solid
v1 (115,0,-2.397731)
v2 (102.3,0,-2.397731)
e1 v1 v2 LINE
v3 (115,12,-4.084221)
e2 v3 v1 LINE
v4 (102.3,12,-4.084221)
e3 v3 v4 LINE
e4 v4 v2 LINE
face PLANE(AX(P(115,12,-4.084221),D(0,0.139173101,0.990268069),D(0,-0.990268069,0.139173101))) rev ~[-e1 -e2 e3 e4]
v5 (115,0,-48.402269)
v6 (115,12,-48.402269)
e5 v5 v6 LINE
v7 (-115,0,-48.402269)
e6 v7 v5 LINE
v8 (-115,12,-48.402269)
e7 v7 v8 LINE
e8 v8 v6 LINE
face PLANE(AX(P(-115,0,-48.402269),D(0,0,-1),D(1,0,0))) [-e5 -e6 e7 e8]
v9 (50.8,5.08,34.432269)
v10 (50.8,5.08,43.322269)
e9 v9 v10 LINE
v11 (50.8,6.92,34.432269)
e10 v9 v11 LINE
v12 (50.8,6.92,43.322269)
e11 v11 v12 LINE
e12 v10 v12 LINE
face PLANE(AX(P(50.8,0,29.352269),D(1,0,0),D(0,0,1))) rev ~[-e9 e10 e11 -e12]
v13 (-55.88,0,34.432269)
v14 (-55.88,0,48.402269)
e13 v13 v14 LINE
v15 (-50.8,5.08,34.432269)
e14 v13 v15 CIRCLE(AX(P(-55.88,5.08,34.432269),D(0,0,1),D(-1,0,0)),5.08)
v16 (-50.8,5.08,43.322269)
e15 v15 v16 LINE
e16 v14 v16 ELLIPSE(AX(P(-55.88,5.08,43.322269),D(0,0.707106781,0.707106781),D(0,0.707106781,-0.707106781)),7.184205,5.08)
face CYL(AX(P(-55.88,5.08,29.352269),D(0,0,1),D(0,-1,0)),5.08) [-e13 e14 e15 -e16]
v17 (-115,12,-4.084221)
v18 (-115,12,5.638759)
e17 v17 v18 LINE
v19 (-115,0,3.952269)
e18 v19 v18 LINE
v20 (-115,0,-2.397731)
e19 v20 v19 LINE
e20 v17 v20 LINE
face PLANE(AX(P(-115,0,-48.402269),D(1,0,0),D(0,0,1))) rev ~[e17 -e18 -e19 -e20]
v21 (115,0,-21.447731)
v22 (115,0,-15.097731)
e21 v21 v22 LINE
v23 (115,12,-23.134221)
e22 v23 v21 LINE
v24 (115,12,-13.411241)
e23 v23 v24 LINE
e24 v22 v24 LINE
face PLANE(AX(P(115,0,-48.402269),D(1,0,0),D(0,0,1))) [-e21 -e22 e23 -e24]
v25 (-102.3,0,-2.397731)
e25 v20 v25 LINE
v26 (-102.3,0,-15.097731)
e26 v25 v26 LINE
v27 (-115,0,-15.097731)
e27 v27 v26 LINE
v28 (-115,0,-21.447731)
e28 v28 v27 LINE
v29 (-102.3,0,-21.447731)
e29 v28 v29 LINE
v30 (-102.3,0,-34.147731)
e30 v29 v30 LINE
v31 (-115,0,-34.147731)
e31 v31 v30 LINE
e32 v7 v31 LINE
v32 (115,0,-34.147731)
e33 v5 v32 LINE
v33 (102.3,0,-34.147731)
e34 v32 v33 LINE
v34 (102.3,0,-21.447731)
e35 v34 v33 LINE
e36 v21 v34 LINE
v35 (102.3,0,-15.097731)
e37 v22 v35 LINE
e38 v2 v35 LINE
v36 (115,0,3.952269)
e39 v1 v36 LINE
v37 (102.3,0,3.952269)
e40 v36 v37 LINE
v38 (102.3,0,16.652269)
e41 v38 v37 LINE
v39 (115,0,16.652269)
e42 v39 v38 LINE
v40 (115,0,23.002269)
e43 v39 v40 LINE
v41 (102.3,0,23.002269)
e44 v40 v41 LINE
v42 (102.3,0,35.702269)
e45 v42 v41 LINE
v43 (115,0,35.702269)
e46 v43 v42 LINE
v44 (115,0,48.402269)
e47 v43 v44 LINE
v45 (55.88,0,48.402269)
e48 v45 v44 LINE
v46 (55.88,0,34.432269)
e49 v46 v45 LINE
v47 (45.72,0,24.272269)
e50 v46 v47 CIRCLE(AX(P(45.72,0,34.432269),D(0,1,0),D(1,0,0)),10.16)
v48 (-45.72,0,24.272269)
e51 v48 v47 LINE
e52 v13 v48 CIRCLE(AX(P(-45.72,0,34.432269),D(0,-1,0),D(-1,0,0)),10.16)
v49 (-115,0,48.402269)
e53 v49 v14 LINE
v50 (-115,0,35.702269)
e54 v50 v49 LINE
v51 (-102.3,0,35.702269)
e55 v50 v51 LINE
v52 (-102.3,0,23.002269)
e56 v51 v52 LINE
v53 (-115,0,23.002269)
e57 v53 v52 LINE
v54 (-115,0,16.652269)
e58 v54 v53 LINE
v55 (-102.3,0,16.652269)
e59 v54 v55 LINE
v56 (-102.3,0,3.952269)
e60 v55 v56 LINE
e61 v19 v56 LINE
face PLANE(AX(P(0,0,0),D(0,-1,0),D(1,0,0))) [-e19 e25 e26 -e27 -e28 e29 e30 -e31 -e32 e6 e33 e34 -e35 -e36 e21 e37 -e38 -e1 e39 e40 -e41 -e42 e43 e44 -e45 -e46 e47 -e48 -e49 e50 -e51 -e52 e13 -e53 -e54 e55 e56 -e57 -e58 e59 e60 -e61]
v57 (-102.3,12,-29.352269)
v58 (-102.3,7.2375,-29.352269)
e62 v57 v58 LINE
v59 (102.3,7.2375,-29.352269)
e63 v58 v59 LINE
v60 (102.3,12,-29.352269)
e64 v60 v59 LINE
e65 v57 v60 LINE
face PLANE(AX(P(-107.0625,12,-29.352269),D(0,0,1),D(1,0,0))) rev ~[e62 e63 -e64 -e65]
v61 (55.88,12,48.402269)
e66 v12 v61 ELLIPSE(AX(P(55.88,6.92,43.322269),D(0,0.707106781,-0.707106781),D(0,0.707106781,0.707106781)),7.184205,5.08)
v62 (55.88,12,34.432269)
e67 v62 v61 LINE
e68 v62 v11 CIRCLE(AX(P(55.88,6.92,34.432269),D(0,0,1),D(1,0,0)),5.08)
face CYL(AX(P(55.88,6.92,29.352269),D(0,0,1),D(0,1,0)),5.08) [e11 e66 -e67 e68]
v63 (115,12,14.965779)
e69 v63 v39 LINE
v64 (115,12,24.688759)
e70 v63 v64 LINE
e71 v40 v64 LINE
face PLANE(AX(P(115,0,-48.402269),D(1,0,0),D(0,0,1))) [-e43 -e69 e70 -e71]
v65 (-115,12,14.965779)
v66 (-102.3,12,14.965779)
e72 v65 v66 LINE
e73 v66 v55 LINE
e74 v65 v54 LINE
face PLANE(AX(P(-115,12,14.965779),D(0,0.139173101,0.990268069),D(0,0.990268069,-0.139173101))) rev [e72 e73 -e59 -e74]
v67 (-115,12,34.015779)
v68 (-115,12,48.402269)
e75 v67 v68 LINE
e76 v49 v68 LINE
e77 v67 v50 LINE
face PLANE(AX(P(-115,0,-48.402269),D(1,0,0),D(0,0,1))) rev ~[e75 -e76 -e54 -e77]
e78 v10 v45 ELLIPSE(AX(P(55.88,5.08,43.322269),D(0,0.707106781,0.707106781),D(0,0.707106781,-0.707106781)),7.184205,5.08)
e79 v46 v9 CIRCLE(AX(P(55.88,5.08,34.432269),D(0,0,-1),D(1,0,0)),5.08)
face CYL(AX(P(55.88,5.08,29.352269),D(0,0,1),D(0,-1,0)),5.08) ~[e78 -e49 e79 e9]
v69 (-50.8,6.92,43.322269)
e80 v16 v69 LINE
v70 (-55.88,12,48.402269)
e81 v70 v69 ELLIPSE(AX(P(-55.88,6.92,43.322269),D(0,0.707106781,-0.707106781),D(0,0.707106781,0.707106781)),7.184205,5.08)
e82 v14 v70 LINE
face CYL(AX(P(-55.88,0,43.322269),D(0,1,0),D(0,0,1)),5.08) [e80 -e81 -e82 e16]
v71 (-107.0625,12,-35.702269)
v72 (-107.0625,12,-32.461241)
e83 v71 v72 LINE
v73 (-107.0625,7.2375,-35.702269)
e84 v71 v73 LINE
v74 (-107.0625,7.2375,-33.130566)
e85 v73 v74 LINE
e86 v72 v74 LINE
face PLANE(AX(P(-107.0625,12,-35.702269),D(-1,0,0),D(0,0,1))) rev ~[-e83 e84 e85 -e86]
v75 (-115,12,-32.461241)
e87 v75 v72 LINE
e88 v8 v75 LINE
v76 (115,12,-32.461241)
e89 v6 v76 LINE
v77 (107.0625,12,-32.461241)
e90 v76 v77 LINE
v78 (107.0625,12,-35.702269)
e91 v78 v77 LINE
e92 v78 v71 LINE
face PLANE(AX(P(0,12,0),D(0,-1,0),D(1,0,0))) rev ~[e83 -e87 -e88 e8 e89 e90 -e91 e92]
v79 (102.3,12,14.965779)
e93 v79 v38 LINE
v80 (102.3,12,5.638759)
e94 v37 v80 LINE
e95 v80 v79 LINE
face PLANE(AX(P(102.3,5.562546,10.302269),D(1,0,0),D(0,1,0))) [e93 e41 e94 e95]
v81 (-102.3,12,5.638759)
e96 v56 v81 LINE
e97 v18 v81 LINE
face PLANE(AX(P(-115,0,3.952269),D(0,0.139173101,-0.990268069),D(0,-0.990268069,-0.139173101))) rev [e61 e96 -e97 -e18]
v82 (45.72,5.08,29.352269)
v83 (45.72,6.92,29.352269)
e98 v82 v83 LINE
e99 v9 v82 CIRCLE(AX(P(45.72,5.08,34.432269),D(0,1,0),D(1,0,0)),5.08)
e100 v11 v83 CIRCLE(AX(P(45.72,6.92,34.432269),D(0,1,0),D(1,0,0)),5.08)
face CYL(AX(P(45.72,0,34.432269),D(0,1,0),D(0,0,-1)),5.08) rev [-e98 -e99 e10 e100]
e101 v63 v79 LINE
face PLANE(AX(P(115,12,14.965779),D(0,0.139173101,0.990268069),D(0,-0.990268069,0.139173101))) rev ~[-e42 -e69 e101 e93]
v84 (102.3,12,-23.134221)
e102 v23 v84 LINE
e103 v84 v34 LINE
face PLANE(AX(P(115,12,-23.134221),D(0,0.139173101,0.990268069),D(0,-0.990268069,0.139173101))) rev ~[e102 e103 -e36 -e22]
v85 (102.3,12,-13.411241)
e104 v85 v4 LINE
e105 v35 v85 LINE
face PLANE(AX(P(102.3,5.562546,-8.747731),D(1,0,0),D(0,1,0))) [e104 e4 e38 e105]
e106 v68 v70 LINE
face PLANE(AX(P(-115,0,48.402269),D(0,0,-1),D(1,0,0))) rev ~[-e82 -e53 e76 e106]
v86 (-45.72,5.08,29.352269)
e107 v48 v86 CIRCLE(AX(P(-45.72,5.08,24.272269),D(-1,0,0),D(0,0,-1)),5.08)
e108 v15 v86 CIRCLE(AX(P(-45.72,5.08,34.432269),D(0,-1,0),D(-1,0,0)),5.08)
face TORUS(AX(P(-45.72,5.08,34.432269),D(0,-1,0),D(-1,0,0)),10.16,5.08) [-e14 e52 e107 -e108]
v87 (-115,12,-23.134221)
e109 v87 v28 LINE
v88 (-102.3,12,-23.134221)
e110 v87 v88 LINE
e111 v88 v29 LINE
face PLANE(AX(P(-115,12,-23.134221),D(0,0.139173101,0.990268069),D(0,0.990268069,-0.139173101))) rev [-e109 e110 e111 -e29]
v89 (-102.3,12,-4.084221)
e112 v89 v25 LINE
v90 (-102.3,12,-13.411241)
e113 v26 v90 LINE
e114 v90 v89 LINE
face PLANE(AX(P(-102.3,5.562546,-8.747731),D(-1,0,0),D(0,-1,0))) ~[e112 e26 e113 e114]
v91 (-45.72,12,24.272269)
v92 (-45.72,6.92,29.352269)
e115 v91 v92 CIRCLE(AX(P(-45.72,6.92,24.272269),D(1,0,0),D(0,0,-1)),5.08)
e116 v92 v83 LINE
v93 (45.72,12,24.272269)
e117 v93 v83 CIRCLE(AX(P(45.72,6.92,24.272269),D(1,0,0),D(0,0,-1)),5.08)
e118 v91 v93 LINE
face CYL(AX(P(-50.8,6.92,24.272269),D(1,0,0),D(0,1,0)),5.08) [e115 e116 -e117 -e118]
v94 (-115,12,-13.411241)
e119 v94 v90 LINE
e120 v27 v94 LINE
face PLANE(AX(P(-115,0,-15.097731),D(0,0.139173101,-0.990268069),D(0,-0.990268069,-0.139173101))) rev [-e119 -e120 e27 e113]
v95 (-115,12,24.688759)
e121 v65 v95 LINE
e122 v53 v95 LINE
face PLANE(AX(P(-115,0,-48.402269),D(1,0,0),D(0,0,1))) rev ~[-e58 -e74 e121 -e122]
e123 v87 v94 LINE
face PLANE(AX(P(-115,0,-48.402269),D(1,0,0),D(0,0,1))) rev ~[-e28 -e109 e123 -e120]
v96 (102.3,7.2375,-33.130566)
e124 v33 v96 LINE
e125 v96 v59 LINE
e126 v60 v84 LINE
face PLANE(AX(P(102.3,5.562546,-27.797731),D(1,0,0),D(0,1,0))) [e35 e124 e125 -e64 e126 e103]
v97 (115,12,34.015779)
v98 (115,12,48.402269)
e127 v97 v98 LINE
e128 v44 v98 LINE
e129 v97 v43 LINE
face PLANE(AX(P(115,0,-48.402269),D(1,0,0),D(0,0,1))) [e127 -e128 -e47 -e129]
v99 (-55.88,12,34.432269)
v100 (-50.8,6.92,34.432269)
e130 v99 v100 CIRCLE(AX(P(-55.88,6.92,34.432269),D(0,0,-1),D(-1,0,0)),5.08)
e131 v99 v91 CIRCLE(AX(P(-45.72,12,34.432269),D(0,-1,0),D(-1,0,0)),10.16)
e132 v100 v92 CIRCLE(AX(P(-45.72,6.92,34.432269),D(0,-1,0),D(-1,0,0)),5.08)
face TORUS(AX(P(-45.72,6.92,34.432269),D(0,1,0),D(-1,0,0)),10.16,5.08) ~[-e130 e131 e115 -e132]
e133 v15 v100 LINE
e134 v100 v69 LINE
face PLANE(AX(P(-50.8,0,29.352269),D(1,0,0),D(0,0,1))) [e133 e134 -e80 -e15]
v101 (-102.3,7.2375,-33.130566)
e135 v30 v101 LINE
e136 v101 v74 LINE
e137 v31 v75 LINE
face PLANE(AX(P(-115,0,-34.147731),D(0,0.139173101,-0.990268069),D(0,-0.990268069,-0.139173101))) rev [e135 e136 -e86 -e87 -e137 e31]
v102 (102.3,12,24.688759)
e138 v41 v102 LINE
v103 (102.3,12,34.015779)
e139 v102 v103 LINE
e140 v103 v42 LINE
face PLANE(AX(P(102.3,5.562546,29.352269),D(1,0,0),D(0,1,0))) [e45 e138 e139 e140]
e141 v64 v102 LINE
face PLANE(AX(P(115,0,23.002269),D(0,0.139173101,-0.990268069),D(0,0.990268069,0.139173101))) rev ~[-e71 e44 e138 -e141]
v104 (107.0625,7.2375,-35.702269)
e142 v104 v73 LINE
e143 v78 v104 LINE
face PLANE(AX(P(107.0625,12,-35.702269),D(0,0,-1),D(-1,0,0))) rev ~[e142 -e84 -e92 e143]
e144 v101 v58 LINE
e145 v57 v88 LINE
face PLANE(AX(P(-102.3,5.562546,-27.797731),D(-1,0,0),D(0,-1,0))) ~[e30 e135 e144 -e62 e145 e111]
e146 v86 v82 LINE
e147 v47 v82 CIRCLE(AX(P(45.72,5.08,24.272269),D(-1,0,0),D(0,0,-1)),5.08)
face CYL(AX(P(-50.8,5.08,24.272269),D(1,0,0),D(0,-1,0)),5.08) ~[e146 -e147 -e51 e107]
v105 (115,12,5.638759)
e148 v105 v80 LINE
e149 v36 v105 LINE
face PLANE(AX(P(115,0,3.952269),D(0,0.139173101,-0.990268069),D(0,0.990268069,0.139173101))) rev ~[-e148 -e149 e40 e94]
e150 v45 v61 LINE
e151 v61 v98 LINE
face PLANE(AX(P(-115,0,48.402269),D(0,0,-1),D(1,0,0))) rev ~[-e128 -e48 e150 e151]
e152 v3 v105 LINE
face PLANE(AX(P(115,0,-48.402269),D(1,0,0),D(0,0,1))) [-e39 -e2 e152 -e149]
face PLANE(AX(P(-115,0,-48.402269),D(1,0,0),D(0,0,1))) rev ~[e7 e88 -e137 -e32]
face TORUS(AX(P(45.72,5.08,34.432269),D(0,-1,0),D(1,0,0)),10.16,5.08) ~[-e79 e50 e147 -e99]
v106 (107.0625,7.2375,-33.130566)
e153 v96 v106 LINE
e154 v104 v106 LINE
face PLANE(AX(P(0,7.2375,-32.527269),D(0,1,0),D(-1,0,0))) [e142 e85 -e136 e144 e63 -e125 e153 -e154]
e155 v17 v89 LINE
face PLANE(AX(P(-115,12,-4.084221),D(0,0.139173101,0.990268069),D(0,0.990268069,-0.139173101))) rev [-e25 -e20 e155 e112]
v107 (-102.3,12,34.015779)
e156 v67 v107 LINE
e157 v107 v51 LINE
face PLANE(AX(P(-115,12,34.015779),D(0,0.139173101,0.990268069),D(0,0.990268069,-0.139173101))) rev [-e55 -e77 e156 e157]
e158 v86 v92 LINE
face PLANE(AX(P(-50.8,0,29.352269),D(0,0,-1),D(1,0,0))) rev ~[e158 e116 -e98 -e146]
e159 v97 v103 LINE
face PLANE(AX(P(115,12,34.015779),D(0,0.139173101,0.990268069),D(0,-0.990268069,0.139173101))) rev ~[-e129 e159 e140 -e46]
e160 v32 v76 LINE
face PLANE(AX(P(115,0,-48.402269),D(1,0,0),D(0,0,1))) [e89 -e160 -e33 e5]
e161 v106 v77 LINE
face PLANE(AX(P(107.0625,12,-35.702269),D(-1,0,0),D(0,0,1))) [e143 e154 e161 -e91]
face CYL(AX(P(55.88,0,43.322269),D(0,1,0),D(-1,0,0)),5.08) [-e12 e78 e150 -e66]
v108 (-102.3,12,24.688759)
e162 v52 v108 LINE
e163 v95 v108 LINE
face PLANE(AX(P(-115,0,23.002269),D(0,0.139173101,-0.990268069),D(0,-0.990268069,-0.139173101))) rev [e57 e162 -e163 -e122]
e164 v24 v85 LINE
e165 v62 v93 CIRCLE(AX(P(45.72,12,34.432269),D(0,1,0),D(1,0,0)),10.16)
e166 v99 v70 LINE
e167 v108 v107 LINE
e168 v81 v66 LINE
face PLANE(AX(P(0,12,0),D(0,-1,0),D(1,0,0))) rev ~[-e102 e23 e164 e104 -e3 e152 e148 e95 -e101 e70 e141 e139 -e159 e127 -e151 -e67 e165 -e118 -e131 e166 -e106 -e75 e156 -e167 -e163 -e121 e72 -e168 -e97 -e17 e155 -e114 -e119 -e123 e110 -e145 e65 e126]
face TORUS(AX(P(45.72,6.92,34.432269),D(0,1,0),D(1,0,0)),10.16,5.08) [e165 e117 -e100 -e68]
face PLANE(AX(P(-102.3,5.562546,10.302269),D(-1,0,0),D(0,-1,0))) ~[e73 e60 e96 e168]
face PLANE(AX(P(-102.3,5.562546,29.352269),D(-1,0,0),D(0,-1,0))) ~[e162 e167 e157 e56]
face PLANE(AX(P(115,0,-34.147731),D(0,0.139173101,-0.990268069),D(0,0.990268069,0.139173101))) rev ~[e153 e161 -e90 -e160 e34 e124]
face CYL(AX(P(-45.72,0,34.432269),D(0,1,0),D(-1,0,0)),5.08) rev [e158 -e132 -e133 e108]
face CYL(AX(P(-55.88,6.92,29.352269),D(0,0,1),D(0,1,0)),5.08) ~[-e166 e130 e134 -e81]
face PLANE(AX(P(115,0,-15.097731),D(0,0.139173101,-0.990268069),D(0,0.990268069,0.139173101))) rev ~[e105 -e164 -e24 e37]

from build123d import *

# Parameters (mm, degrees)
F0_W     = 230
F0_H     = 96.8045385678
F1_DEPTH = 12
F2_W     = 101.6
F2_H     = 19.05
F3_DEPTH = 12
F4_R     = 5.08
F6_DEPTH = 12.7
F7_W     = 204.6
F7_H     = 6.35
F7_W_2   = 4.7625
F8_DEPTH = 4.7625


# Not quite as in the source:
# - a pattern or mirror of a feature is missing from the dataset's text; its kind, count and spacing are read off the source's solid


with BuildPart() as f1:
    # F0 (on Front) → F1 (new body)
    with BuildSketch(Plane.XZ):
        Rectangle(F0_W, F0_H)
    extrude(amount=-F1_DEPTH)

    # F2 (on face) → F3 (cut, through all)
    with BuildSketch(Plane.XZ):
        with Locations((0, 38.8772692839)):
            Rectangle(F2_W, F2_H)
    extrude(amount=-F3_DEPTH, mode=Mode.SUBTRACT)

    # F4
    f4_edges = [f1.edges().sort_by_distance(p)[0] for p in [
        (-50.8, 6, 48.402269),
        (-50.8, 6, 29.352269),
        (-50.8, 0, 38.877269),
        (-50.8, 12, 38.877269),
        (50.8, 6, 29.352269),
        (50.8, 6, 48.402269),
        (50.8, 0, 38.877269),
        (50.8, 12, 38.877269),
        (0, 0, 29.352269),
        (0, 12, 29.352269),
    ]]
    fillet(f4_edges, radius=F4_R)

    # F5 (on face) → F6 (cut)
    with BuildSketch(Plane.YZ.offset(115)):
        Polygon((12, 34.0157792675), (0, 35.7022692839), (0, 23.0022692839), (12, 24.6887593003), align=None)
        Polygon((12, 14.9657792675), (0, 16.6522692839), (0, 3.9522692839), (12, 5.6387593003), align=None)
        Polygon((12, -4.0842207325), (0, -2.3977307161), (0, -15.0977307161), (12, -13.4112406997), align=None)
        Polygon((12, -23.1342207325), (0, -21.4477307161), (0, -34.1477307161), (12, -32.4612406997), align=None)
    f6 = extrude(amount=-F6_DEPTH, mode=Mode.SUBTRACT)

    # F6_copies: F6 across plane
    add(f6.mirror(Plane(origin=(0, 0, 0), x_dir=(0, 0, -1), z_dir=(-1, 0, 0))), mode=Mode.SUBTRACT)

    # F7 (on face) → F8 (cut)
    with BuildSketch(Plane(origin=(0, 12, 0), x_dir=(-1, 0, 0), z_dir=(0, 1, 0))):
        with Locations((0, -32.5272692839)):
            Rectangle(F7_W, F7_H)
        with Locations((-104.68125, -32.5272692839)):
            Rectangle(F7_W_2, F7_H)
        with Locations((104.68125, -32.5272692839)):
            Rectangle(F7_W_2, F7_H)
    extrude(amount=-F8_DEPTH, mode=Mode.SUBTRACT)


solid = f1.part
